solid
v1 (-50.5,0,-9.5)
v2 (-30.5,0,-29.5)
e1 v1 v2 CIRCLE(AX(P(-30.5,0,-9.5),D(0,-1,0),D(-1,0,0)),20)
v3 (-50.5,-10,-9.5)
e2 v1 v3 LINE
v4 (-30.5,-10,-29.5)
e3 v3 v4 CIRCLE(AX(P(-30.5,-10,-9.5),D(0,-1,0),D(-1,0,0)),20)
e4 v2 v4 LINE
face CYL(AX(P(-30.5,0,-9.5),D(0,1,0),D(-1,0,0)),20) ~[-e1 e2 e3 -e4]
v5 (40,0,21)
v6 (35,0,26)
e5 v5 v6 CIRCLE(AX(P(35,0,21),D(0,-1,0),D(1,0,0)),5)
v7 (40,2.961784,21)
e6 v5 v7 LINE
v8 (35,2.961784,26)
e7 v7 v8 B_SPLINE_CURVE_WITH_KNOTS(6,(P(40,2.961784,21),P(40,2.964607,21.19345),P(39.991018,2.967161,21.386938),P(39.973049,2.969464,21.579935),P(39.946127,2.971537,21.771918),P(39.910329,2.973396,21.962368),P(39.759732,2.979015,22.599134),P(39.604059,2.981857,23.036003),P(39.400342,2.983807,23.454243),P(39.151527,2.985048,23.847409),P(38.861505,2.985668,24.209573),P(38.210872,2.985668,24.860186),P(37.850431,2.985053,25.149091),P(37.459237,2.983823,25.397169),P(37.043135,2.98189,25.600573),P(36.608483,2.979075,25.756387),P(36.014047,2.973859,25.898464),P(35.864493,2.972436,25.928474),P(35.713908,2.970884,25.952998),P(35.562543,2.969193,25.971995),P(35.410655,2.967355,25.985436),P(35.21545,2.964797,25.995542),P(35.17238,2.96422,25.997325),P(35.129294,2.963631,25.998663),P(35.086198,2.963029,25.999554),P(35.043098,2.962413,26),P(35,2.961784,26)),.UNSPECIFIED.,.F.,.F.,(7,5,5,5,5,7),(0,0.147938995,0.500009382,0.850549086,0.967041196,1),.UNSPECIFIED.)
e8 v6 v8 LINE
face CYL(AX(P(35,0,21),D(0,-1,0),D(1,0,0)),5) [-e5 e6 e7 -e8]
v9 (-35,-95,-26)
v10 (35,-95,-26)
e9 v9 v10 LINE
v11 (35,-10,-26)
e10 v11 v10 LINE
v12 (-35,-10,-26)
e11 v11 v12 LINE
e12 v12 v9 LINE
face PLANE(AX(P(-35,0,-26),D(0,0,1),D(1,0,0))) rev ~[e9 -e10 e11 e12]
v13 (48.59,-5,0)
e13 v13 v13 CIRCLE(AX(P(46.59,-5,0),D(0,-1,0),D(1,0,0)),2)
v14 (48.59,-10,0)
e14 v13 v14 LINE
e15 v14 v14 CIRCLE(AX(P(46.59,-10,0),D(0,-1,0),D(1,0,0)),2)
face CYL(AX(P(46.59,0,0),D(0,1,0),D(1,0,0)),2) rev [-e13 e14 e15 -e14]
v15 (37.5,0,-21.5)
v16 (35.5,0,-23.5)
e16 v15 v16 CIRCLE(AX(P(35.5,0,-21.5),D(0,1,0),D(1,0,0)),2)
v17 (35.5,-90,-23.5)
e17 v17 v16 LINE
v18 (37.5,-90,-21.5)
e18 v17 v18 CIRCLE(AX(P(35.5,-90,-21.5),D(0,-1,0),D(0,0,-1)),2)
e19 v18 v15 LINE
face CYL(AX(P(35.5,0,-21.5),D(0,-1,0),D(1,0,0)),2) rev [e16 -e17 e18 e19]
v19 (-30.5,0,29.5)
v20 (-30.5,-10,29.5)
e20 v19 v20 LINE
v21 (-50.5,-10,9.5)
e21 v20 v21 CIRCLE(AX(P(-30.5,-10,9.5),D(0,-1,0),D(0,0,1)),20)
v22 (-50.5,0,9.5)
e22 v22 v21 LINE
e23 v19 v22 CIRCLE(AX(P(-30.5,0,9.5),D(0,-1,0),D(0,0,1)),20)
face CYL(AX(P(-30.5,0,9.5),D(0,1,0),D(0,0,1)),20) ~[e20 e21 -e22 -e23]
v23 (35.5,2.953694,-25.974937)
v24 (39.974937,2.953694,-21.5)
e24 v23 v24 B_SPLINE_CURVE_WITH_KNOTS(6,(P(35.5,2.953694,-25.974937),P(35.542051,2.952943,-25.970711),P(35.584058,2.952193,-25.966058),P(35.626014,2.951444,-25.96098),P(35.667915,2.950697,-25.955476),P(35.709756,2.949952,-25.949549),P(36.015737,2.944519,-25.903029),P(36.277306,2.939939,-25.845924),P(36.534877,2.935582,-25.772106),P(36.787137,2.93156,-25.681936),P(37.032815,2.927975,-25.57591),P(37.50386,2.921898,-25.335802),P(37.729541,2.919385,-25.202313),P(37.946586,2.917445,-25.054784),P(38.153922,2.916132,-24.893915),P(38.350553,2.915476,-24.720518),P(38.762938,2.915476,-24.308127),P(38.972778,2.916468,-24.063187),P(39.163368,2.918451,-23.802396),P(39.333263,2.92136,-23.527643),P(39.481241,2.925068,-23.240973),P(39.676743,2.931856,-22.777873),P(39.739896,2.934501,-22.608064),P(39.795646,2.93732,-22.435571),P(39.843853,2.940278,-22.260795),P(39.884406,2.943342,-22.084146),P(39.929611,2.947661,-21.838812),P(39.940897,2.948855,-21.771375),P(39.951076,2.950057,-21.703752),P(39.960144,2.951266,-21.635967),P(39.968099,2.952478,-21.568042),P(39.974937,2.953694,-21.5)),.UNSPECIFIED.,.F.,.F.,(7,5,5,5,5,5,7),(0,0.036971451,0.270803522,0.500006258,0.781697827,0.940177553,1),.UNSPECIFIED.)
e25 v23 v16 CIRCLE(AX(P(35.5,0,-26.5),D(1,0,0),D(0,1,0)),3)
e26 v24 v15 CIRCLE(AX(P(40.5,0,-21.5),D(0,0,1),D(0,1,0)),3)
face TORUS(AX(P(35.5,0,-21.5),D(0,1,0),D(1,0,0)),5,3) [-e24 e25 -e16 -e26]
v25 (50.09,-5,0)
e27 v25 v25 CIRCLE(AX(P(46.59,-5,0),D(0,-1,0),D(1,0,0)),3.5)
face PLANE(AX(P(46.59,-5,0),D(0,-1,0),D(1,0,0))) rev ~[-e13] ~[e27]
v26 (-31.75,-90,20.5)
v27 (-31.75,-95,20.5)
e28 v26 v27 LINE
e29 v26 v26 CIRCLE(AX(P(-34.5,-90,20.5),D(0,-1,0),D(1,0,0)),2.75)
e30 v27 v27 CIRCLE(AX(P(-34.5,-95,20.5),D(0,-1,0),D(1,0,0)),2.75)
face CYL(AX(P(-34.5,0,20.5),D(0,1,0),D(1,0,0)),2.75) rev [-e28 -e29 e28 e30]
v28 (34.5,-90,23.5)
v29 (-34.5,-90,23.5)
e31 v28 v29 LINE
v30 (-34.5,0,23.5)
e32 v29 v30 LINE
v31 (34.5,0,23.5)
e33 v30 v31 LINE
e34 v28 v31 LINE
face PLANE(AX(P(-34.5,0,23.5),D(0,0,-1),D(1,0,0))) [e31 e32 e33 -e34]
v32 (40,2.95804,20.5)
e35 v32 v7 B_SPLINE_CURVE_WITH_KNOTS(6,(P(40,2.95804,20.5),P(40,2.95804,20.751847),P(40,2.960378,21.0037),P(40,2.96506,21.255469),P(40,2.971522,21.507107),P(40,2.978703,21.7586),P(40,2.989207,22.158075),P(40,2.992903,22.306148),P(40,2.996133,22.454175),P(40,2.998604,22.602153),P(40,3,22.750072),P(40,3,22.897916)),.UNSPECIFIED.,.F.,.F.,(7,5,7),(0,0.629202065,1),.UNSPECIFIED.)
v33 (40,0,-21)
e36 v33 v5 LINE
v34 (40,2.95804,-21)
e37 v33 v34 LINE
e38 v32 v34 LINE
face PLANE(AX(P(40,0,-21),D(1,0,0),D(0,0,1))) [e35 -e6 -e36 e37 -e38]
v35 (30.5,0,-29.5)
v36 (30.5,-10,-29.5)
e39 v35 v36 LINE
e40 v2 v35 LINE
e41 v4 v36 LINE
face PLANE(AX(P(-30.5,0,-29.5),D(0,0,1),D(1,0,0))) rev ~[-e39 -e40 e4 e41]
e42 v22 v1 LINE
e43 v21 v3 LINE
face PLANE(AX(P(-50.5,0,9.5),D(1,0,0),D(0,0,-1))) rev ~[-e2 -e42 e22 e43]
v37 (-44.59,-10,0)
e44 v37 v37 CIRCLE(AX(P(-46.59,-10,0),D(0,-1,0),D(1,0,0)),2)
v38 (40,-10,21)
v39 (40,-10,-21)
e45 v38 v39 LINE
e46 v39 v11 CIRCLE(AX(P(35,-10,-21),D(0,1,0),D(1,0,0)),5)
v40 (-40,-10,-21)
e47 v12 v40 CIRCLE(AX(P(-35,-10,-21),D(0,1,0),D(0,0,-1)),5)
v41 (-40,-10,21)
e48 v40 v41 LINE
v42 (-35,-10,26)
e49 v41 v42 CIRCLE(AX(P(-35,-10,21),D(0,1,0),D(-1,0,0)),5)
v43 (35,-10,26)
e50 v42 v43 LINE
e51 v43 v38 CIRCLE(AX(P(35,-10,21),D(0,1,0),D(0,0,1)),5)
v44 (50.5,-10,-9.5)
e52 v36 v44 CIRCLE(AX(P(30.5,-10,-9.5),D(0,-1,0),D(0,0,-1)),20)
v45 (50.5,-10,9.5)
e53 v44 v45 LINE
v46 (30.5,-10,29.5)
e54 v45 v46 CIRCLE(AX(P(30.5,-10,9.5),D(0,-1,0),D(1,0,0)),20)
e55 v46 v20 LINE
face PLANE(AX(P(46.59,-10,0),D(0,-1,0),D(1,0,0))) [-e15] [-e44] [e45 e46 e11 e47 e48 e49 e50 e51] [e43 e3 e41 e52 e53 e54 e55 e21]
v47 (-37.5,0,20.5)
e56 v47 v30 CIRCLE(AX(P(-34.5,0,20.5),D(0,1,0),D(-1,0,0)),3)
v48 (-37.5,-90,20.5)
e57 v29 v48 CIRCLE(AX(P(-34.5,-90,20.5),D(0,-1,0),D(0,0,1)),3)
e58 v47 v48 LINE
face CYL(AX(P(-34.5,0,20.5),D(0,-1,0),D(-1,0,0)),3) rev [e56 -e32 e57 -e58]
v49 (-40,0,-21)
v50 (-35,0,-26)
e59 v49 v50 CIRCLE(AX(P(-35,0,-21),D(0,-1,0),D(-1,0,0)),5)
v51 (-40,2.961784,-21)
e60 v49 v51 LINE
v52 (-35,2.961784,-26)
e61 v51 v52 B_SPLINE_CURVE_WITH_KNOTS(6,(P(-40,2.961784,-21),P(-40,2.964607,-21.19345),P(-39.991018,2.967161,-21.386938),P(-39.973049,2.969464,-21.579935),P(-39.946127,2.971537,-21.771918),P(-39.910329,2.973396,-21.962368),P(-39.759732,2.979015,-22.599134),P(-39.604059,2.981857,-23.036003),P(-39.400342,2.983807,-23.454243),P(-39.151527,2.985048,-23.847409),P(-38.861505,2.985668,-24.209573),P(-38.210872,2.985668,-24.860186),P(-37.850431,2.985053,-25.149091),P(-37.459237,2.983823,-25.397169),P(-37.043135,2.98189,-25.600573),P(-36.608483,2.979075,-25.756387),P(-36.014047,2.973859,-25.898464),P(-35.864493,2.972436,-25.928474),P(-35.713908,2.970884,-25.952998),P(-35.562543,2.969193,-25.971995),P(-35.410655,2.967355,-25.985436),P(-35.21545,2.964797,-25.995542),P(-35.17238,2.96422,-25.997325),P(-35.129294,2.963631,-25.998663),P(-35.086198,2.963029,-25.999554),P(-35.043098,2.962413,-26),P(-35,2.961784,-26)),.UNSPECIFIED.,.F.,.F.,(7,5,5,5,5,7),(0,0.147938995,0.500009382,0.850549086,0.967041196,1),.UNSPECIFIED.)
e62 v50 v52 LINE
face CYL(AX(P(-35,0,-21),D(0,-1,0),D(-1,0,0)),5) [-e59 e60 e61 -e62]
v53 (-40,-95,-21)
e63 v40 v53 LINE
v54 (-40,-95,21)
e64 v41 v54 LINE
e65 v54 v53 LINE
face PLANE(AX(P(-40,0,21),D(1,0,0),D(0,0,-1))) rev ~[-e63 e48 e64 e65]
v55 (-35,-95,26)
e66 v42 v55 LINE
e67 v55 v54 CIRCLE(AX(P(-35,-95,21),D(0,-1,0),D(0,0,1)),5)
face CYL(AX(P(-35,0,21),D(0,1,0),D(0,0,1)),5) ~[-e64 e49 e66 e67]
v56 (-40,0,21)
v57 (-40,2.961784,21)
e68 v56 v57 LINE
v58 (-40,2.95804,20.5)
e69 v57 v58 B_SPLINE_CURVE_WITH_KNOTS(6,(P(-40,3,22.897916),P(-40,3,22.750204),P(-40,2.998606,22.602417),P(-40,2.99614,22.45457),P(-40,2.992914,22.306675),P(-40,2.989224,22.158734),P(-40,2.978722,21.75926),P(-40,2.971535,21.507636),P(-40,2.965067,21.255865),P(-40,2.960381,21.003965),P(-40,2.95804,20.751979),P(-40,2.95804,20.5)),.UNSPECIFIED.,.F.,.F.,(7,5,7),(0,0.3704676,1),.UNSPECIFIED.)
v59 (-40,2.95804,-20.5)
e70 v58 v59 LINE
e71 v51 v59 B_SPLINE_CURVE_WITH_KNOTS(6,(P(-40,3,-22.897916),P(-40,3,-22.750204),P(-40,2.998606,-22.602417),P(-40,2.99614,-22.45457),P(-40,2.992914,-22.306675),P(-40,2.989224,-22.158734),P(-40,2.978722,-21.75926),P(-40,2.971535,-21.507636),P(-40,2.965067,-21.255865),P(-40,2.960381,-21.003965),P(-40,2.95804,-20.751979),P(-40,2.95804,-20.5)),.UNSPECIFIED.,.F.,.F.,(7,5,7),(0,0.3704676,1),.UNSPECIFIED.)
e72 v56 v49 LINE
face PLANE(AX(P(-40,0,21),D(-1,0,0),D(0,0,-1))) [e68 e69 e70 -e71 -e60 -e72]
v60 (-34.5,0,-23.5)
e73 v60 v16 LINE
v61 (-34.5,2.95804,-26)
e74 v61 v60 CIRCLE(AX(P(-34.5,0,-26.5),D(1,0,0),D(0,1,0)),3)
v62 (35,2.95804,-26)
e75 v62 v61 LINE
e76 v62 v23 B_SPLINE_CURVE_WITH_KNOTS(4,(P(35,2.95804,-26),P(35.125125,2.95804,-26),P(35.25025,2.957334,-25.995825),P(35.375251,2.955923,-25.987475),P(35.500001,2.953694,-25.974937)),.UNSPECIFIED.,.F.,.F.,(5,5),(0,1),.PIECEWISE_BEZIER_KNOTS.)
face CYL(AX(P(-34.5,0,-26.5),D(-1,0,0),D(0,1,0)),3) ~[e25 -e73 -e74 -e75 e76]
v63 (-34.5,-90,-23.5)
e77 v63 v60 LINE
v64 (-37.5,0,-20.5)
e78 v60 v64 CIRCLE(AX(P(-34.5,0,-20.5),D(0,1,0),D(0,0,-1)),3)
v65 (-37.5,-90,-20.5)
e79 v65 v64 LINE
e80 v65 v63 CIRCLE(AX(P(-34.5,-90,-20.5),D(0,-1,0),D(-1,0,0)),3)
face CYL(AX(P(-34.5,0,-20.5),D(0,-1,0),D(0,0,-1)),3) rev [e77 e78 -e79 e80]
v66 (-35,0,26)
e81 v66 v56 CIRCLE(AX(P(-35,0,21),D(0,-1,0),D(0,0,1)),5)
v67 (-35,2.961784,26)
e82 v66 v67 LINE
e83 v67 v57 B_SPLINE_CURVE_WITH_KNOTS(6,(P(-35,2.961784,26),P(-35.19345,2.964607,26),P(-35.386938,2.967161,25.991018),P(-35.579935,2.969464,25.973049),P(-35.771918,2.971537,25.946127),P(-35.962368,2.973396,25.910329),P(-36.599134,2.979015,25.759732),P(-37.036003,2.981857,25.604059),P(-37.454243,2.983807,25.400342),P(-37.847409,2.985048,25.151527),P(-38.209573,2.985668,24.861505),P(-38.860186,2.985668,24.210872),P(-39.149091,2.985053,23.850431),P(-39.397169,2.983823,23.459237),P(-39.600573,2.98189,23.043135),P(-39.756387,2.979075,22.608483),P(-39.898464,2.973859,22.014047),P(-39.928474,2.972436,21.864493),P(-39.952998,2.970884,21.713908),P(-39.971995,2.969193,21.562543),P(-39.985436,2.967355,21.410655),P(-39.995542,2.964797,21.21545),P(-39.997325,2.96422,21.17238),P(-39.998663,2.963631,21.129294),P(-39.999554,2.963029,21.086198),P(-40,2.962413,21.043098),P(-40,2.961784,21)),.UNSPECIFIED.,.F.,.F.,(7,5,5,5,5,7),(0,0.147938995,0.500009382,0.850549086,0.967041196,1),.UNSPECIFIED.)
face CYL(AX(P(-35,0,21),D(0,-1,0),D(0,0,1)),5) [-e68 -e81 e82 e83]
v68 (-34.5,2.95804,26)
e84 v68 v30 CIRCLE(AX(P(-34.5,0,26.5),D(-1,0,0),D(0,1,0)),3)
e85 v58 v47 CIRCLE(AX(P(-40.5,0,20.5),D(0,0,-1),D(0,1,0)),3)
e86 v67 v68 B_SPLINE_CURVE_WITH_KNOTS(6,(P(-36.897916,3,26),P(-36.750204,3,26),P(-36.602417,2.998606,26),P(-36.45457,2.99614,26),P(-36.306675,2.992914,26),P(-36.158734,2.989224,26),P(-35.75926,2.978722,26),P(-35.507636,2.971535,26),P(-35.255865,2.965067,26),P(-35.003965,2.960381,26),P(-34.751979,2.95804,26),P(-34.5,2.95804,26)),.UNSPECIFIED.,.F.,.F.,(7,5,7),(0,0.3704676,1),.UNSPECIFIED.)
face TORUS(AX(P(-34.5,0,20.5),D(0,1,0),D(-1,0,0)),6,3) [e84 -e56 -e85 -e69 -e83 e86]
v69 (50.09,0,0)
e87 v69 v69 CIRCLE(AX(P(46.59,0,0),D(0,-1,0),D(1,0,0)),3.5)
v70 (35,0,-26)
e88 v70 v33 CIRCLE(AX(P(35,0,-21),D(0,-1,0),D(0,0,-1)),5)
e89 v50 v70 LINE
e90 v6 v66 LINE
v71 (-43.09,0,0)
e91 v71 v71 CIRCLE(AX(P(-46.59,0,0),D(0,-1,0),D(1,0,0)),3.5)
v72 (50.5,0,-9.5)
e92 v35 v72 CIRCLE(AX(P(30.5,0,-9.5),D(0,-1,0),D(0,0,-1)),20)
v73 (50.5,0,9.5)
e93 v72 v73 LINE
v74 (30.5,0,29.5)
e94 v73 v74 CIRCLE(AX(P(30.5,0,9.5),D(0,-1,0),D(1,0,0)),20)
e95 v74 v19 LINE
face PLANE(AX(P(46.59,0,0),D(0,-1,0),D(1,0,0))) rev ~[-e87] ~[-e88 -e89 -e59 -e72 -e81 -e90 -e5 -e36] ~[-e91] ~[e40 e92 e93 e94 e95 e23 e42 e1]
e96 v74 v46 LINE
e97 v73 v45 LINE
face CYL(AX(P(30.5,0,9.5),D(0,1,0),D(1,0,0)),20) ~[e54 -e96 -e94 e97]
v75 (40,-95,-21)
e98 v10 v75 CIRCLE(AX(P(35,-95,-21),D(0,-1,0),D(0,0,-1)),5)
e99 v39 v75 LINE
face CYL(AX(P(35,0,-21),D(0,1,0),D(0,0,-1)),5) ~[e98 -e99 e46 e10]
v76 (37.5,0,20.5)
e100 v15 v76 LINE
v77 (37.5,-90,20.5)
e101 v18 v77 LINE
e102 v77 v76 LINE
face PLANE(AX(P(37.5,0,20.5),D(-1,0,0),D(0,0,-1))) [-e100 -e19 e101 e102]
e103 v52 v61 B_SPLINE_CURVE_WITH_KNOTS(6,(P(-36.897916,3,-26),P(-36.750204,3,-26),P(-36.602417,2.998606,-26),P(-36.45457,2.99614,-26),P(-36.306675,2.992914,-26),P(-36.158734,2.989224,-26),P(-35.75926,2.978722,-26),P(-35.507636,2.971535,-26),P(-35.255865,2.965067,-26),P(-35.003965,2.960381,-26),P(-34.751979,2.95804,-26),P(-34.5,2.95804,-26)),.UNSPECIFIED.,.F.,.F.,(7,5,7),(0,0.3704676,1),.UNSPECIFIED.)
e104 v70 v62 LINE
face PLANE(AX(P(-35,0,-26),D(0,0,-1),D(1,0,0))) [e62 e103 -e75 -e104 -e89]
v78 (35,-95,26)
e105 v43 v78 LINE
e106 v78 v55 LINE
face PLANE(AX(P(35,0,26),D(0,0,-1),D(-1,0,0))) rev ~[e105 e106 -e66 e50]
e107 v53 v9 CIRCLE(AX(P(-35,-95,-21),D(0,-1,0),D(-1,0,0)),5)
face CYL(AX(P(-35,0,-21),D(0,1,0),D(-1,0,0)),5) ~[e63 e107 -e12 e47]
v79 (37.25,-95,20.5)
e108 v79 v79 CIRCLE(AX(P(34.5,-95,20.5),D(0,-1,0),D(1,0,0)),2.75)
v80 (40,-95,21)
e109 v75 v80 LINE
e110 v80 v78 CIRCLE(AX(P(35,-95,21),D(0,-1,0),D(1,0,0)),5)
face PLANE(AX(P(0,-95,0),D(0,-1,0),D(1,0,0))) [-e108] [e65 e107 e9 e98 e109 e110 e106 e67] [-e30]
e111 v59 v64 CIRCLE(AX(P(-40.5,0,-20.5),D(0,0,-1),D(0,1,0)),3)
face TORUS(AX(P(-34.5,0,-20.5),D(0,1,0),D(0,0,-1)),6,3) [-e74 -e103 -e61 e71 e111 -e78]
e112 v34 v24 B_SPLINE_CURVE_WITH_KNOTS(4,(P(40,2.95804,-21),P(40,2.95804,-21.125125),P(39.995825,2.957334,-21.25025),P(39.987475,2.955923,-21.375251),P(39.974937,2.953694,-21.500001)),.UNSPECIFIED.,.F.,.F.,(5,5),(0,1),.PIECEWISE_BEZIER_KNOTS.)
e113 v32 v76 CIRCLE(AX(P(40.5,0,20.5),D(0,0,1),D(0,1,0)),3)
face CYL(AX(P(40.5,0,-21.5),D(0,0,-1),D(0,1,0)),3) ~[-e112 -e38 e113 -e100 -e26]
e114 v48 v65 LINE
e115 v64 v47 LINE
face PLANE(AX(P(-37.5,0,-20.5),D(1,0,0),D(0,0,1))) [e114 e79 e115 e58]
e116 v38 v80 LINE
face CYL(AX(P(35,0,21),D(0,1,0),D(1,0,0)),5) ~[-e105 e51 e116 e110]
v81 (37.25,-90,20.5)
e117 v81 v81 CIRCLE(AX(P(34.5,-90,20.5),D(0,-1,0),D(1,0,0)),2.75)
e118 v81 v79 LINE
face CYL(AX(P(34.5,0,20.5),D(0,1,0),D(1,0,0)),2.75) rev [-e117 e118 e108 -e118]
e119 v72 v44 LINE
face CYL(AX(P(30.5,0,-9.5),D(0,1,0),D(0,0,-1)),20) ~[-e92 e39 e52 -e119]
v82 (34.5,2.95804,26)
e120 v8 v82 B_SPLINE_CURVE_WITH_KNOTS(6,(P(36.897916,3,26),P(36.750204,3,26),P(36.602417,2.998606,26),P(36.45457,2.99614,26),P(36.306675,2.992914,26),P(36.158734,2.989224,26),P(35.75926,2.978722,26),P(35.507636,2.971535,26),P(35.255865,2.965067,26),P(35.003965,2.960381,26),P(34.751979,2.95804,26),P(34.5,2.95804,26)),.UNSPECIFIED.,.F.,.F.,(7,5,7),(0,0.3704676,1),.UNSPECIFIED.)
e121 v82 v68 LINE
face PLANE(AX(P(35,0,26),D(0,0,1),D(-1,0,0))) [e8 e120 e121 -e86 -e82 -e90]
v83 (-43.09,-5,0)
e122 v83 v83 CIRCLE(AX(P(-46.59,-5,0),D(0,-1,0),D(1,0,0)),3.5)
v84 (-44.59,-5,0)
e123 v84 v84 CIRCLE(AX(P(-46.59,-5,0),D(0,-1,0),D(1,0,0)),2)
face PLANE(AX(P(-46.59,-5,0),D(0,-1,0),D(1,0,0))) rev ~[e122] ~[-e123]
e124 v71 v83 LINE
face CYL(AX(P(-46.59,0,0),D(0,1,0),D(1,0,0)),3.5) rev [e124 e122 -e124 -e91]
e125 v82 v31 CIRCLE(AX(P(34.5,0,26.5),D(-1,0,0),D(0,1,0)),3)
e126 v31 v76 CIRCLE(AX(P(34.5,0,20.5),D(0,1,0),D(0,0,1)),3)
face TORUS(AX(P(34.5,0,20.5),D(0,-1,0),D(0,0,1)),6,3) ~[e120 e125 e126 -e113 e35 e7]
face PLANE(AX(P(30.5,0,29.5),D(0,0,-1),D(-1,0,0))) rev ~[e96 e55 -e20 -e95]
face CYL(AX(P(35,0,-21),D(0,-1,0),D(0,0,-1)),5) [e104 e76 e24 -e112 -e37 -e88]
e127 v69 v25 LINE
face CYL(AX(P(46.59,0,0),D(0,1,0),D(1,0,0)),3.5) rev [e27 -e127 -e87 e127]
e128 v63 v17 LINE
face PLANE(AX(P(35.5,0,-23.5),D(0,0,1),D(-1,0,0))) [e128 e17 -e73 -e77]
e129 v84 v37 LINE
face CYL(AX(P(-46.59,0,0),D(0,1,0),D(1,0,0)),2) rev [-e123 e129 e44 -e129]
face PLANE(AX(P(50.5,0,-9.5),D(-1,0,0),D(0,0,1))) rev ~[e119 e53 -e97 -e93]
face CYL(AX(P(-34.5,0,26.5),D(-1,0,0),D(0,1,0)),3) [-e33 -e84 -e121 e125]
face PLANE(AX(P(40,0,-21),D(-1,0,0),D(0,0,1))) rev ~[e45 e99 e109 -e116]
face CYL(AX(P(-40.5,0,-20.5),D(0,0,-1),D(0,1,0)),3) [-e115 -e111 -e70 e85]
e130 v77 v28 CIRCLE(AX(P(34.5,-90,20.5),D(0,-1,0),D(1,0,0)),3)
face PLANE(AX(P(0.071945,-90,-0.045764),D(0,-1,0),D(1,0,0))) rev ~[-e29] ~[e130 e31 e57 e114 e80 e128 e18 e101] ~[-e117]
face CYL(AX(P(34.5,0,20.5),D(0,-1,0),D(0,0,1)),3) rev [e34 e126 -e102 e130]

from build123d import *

# Parameters (mm, degrees)
F0_R         = 3.5
F1_DEPTH     = 10
F0_R_2       = 2.75
F2_DEPTH     = 95
F3_DEPTH     = 90
F4_DEPTH     = 3
F5_T1_DEPTH  = 41
F5_T3_DEPTH  = 70
F5_T5_DEPTH  = 42
F5_T7_DEPTH  = 69
F5_T10_ANGLE = 90
F5_T12_ANGLE = 90
F5_T14_ANGLE = 90
F5_T16_ANGLE = 90
F0_R_3       = 2
F6_DEPTH     = 10
F7_DEPTH     = 5


# Not quite as in the source:
# - a fillet or chamfer that OpenCascade refuses, or shapes differently, is made with other operations: its cross-section is extruded or revolved along the edge and cut away or added


with BuildPart() as f1:
    # F0 (on Front) → F1 (new body)
    with BuildSketch(Plane.XZ):
        with BuildLine():
            Line((30.5, 29.5), (-30.5, 29.5))
            ThreePointArc((-30.5, 29.5), (-44.6421356237, 23.6421356237), (-50.5, 9.5))
            Line((-50.5, 9.5), (-50.5, -9.5))
            ThreePointArc((-50.5, -9.5), (-44.6421356237, -23.6421356237), (-30.5, -29.5))
            Line((-30.5, -29.5), (30.5, -29.5))
            ThreePointArc((30.5, -29.5), (44.6421356237, -23.6421356237), (50.5, -9.5))
            Line((50.5, -9.5), (50.5, 9.5))
            ThreePointArc((50.5, 9.5), (44.6421356237, 23.6421356237), (30.5, 29.5))
        make_face()
        with Locations((-46.59, 0)):
            Circle(F0_R, mode=Mode.SUBTRACT)
        with BuildLine():
            ThreePointArc((-40, 21), (-38.5355339059, 24.5355339059), (-35, 26))
            Line((-35, 26), (35, 26))
            ThreePointArc((35, 26), (38.5355339059, 24.5355339059), (40, 21))
            Line((40, 21), (40, -21))
            ThreePointArc((40, -21), (38.5355339059, -24.5355339059), (35, -26))
            Line((35, -26), (-35, -26))
            ThreePointArc((-35, -26), (-38.5355339059, -24.5355339059), (-40, -21))
            Line((-40, -21), (-40, 21))
        make_face(mode=Mode.SUBTRACT)
        with Locations((46.59, 0)):
            Circle(F0_R, mode=Mode.SUBTRACT)
    extrude(amount=F1_DEPTH)

    # F0 (on Front) → F2 (join)
    with BuildSketch(Plane.XZ):
        with BuildLine():
            Line((35, 26), (-35, 26))
            ThreePointArc((-35, 26), (-38.5355339059, 24.5355339059), (-40, 21))
            Line((-40, 21), (-40, -21))
            ThreePointArc((-40, -21), (-38.5355339059, -24.5355339059), (-35, -26))
            Line((-35, -26), (35, -26))
            ThreePointArc((35, -26), (38.5355339059, -24.5355339059), (40, -21))
            Line((40, -21), (40, 21))
            ThreePointArc((40, 21), (38.5355339059, 24.5355339059), (35, 26))
        make_face()
        with BuildLine():
            ThreePointArc((-37.5, 20.5), (-36.6213203436, 22.6213203436), (-34.5, 23.5))
            Line((-34.5, 23.5), (34.5, 23.5))
            ThreePointArc((34.5, 23.5), (36.6213203436, 22.6213203436), (37.5, 20.5))
            Line((37.5, 20.5), (37.5, -21.5))
            ThreePointArc((37.5, -21.5), (36.9142135624, -22.9142135624), (35.5, -23.5))
            Line((35.5, -23.5), (-34.5, -23.5))
            ThreePointArc((-34.5, -23.5), (-36.6213203436, -22.6213203436), (-37.5, -20.5))
            Line((-37.5, -20.5), (-37.5, 20.5))
        make_face(mode=Mode.SUBTRACT)
        with BuildLine():
            Line((34.5, 23.5), (-34.5, 23.5))
            ThreePointArc((-34.5, 23.5), (-36.6213203436, 22.6213203436), (-37.5, 20.5))
            Line((-37.5, 20.5), (-37.5, -20.5))
            ThreePointArc((-37.5, -20.5), (-36.6213203436, -22.6213203436), (-34.5, -23.5))
            Line((-34.5, -23.5), (35.5, -23.5))
            ThreePointArc((35.5, -23.5), (36.9142135624, -22.9142135624), (37.5, -21.5))
            Line((37.5, -21.5), (37.5, 20.5))
            ThreePointArc((37.5, 20.5), (36.6213203436, 22.6213203436), (34.5, 23.5))
        make_face()
        with Locations((-34.5, 20.5)):
            Circle(F0_R_2, mode=Mode.SUBTRACT)
        with Locations((34.5, 20.5)):
            Circle(F0_R_2, mode=Mode.SUBTRACT)
    extrude(amount=F2_DEPTH)

    # F0 (on Front) → F3 (cut)
    with BuildSketch(Plane.XZ):
        with BuildLine():
            Line((34.5, 23.5), (-34.5, 23.5))
            ThreePointArc((-34.5, 23.5), (-36.6213203436, 22.6213203436), (-37.5, 20.5))
            Line((-37.5, 20.5), (-37.5, -20.5))
            ThreePointArc((-37.5, -20.5), (-36.6213203436, -22.6213203436), (-34.5, -23.5))
            Line((-34.5, -23.5), (35.5, -23.5))
            ThreePointArc((35.5, -23.5), (36.9142135624, -22.9142135624), (37.5, -21.5))
            Line((37.5, -21.5), (37.5, 20.5))
            ThreePointArc((37.5, 20.5), (36.6213203436, 22.6213203436), (34.5, 23.5))
        make_face()
        with Locations((-34.5, 20.5)):
            Circle(F0_R_2, mode=Mode.SUBTRACT)
        with Locations((34.5, 20.5)):
            Circle(F0_R_2, mode=Mode.SUBTRACT)
    extrude(amount=F3_DEPTH, mode=Mode.SUBTRACT)

    # F0 (on Front) → F4 (join)
    with BuildSketch(Plane.XZ):
        with BuildLine():
            Line((35, 26), (-35, 26))
            ThreePointArc((-35, 26), (-38.5355339059, 24.5355339059), (-40, 21))
            Line((-40, 21), (-40, -21))
            ThreePointArc((-40, -21), (-38.5355339059, -24.5355339059), (-35, -26))
            Line((-35, -26), (35, -26))
            ThreePointArc((35, -26), (38.5355339059, -24.5355339059), (40, -21))
            Line((40, -21), (40, 21))
            ThreePointArc((40, 21), (38.5355339059, 24.5355339059), (35, 26))
        make_face()
        with BuildLine():
            ThreePointArc((-37.5, 20.5), (-36.6213203436, 22.6213203436), (-34.5, 23.5))
            Line((-34.5, 23.5), (34.5, 23.5))
            ThreePointArc((34.5, 23.5), (36.6213203436, 22.6213203436), (37.5, 20.5))
            Line((37.5, 20.5), (37.5, -21.5))
            ThreePointArc((37.5, -21.5), (36.9142135624, -22.9142135624), (35.5, -23.5))
            Line((35.5, -23.5), (-34.5, -23.5))
            ThreePointArc((-34.5, -23.5), (-36.6213203436, -22.6213203436), (-37.5, -20.5))
            Line((-37.5, -20.5), (-37.5, 20.5))
        make_face(mode=Mode.SUBTRACT)
    extrude(amount=-F4_DEPTH)

    # F5: fillet of radius 3 on 2 edges, made by hand

    # F5_s2 → F5_t1 (cut)
    with BuildSketch(Plane.XY.offset(-20.5)):
        with BuildLine():
            ThreePointArc((-40.5, 3), (-38.3786796564, 2.1213203436), (-37.5, 0))
            Line((-37.5, 0), (-37.5, 3))
            Line((-37.5, 3), (-40.5, 3))
        make_face()
    extrude(amount=F5_T1_DEPTH, mode=Mode.SUBTRACT)

    # F5_s4 → F5_t3 (cut)
    with BuildSketch(Plane.YZ.offset(-34.5)):
        with BuildLine():
            ThreePointArc((3, -26.5), (2.1213203436, -24.3786796564), (0, -23.5))
            Line((0, -23.5), (3, -23.5))
            Line((3, -23.5), (3, -26.5))
        make_face()
    extrude(amount=F5_T3_DEPTH, mode=Mode.SUBTRACT)

    # F5_s6 → F5_t5 (cut)
    with BuildSketch(Plane.XY.offset(-21.5)):
        with BuildLine():
            ThreePointArc((40.5, 3), (38.3786796564, 2.1213203436), (37.5, 0))
            Line((37.5, 0), (37.5, 3))
            Line((37.5, 3), (40.5, 3))
        make_face()
    extrude(amount=F5_T5_DEPTH, mode=Mode.SUBTRACT)

    # F5_s8 → F5_t7 (cut)
    with BuildSketch(Plane.YZ.offset(-34.5)):
        with BuildLine():
            ThreePointArc((3, 26.5), (2.1213203436, 24.3786796564), (0, 23.5))
            Line((0, 23.5), (3, 23.5))
            Line((3, 23.5), (3, 26.5))
        make_face()
    extrude(amount=F5_T7_DEPTH, mode=Mode.SUBTRACT)

    # F5_s9 → F5_t10 (revolve, cut)
    with BuildSketch(Plane.XY.offset(-21.5)):
        with BuildLine():
            ThreePointArc((40.5, 3), (38.3786796564, 2.1213203436), (37.5, 0))
            Line((37.5, 0), (37.5, 3))
            Line((37.5, 3), (40.5, 3))
        make_face()
    revolve(axis=Axis((35.5, 3, -21.5), (0, 1, 0)), revolution_arc=F5_T10_ANGLE, mode=Mode.SUBTRACT)

    # F5_s11 → F5_t12 (revolve, cut)
    with BuildSketch(Plane.YZ.offset(-34.5)):
        with BuildLine():
            ThreePointArc((3, -26.5), (2.1213203436, -24.3786796564), (0, -23.5))
            Line((0, -23.5), (3, -23.5))
            Line((3, -23.5), (3, -26.5))
        make_face()
    revolve(axis=Axis((-34.5, 3, -20.5), (0, 1, 0)), revolution_arc=F5_T12_ANGLE, mode=Mode.SUBTRACT)

    # F5_s13 → F5_t14 (revolve, cut)
    with BuildSketch(Plane.YZ.offset(34.5)):
        with BuildLine():
            ThreePointArc((0, 23.5), (2.1213203436, 24.3786796564), (3, 26.5))
            Line((3, 26.5), (3, 23.5))
            Line((3, 23.5), (0, 23.5))
        make_face()
    revolve(axis=Axis((34.5, 3, 20.5), (0, 1, 0)), revolution_arc=F5_T14_ANGLE, mode=Mode.SUBTRACT)

    # F5_s15 → F5_t16 (revolve, cut)
    with BuildSketch(Plane.XY.offset(20.5)):
        with BuildLine():
            ThreePointArc((-40.5, 3), (-38.3786796564, 2.1213203436), (-37.5, 0))
            Line((-37.5, 0), (-37.5, 3))
            Line((-37.5, 3), (-40.5, 3))
        make_face()
    revolve(axis=Axis((-34.5, 3, 20.5), (0, 1, 0)), revolution_arc=F5_T16_ANGLE, mode=Mode.SUBTRACT)

    # F0 (on Front) → F6 (join)
    with BuildSketch(Plane.XZ):
        with Locations((46.59, 0)):
            Circle(F0_R)
        with Locations((46.59, 0)):
            Circle(F0_R_3, mode=Mode.SUBTRACT)
        with Locations((-46.59, 0)):
            Circle(F0_R)
        with Locations((-46.59, 0)):
            Circle(F0_R_3, mode=Mode.SUBTRACT)
    extrude(amount=F6_DEPTH)

    # F0 (on Front) → F7 (cut)
    with BuildSketch(Plane.XZ):
        with Locations((46.59, 0)):
            Circle(F0_R)
        with Locations((46.59, 0)):
            Circle(F0_R_3, mode=Mode.SUBTRACT)
        with Locations((-46.59, 0)):
            Circle(F0_R)
        with Locations((-46.59, 0)):
            Circle(F0_R_3, mode=Mode.SUBTRACT)
    extrude(amount=F7_DEPTH, mode=Mode.SUBTRACT)


solid = f1.part
